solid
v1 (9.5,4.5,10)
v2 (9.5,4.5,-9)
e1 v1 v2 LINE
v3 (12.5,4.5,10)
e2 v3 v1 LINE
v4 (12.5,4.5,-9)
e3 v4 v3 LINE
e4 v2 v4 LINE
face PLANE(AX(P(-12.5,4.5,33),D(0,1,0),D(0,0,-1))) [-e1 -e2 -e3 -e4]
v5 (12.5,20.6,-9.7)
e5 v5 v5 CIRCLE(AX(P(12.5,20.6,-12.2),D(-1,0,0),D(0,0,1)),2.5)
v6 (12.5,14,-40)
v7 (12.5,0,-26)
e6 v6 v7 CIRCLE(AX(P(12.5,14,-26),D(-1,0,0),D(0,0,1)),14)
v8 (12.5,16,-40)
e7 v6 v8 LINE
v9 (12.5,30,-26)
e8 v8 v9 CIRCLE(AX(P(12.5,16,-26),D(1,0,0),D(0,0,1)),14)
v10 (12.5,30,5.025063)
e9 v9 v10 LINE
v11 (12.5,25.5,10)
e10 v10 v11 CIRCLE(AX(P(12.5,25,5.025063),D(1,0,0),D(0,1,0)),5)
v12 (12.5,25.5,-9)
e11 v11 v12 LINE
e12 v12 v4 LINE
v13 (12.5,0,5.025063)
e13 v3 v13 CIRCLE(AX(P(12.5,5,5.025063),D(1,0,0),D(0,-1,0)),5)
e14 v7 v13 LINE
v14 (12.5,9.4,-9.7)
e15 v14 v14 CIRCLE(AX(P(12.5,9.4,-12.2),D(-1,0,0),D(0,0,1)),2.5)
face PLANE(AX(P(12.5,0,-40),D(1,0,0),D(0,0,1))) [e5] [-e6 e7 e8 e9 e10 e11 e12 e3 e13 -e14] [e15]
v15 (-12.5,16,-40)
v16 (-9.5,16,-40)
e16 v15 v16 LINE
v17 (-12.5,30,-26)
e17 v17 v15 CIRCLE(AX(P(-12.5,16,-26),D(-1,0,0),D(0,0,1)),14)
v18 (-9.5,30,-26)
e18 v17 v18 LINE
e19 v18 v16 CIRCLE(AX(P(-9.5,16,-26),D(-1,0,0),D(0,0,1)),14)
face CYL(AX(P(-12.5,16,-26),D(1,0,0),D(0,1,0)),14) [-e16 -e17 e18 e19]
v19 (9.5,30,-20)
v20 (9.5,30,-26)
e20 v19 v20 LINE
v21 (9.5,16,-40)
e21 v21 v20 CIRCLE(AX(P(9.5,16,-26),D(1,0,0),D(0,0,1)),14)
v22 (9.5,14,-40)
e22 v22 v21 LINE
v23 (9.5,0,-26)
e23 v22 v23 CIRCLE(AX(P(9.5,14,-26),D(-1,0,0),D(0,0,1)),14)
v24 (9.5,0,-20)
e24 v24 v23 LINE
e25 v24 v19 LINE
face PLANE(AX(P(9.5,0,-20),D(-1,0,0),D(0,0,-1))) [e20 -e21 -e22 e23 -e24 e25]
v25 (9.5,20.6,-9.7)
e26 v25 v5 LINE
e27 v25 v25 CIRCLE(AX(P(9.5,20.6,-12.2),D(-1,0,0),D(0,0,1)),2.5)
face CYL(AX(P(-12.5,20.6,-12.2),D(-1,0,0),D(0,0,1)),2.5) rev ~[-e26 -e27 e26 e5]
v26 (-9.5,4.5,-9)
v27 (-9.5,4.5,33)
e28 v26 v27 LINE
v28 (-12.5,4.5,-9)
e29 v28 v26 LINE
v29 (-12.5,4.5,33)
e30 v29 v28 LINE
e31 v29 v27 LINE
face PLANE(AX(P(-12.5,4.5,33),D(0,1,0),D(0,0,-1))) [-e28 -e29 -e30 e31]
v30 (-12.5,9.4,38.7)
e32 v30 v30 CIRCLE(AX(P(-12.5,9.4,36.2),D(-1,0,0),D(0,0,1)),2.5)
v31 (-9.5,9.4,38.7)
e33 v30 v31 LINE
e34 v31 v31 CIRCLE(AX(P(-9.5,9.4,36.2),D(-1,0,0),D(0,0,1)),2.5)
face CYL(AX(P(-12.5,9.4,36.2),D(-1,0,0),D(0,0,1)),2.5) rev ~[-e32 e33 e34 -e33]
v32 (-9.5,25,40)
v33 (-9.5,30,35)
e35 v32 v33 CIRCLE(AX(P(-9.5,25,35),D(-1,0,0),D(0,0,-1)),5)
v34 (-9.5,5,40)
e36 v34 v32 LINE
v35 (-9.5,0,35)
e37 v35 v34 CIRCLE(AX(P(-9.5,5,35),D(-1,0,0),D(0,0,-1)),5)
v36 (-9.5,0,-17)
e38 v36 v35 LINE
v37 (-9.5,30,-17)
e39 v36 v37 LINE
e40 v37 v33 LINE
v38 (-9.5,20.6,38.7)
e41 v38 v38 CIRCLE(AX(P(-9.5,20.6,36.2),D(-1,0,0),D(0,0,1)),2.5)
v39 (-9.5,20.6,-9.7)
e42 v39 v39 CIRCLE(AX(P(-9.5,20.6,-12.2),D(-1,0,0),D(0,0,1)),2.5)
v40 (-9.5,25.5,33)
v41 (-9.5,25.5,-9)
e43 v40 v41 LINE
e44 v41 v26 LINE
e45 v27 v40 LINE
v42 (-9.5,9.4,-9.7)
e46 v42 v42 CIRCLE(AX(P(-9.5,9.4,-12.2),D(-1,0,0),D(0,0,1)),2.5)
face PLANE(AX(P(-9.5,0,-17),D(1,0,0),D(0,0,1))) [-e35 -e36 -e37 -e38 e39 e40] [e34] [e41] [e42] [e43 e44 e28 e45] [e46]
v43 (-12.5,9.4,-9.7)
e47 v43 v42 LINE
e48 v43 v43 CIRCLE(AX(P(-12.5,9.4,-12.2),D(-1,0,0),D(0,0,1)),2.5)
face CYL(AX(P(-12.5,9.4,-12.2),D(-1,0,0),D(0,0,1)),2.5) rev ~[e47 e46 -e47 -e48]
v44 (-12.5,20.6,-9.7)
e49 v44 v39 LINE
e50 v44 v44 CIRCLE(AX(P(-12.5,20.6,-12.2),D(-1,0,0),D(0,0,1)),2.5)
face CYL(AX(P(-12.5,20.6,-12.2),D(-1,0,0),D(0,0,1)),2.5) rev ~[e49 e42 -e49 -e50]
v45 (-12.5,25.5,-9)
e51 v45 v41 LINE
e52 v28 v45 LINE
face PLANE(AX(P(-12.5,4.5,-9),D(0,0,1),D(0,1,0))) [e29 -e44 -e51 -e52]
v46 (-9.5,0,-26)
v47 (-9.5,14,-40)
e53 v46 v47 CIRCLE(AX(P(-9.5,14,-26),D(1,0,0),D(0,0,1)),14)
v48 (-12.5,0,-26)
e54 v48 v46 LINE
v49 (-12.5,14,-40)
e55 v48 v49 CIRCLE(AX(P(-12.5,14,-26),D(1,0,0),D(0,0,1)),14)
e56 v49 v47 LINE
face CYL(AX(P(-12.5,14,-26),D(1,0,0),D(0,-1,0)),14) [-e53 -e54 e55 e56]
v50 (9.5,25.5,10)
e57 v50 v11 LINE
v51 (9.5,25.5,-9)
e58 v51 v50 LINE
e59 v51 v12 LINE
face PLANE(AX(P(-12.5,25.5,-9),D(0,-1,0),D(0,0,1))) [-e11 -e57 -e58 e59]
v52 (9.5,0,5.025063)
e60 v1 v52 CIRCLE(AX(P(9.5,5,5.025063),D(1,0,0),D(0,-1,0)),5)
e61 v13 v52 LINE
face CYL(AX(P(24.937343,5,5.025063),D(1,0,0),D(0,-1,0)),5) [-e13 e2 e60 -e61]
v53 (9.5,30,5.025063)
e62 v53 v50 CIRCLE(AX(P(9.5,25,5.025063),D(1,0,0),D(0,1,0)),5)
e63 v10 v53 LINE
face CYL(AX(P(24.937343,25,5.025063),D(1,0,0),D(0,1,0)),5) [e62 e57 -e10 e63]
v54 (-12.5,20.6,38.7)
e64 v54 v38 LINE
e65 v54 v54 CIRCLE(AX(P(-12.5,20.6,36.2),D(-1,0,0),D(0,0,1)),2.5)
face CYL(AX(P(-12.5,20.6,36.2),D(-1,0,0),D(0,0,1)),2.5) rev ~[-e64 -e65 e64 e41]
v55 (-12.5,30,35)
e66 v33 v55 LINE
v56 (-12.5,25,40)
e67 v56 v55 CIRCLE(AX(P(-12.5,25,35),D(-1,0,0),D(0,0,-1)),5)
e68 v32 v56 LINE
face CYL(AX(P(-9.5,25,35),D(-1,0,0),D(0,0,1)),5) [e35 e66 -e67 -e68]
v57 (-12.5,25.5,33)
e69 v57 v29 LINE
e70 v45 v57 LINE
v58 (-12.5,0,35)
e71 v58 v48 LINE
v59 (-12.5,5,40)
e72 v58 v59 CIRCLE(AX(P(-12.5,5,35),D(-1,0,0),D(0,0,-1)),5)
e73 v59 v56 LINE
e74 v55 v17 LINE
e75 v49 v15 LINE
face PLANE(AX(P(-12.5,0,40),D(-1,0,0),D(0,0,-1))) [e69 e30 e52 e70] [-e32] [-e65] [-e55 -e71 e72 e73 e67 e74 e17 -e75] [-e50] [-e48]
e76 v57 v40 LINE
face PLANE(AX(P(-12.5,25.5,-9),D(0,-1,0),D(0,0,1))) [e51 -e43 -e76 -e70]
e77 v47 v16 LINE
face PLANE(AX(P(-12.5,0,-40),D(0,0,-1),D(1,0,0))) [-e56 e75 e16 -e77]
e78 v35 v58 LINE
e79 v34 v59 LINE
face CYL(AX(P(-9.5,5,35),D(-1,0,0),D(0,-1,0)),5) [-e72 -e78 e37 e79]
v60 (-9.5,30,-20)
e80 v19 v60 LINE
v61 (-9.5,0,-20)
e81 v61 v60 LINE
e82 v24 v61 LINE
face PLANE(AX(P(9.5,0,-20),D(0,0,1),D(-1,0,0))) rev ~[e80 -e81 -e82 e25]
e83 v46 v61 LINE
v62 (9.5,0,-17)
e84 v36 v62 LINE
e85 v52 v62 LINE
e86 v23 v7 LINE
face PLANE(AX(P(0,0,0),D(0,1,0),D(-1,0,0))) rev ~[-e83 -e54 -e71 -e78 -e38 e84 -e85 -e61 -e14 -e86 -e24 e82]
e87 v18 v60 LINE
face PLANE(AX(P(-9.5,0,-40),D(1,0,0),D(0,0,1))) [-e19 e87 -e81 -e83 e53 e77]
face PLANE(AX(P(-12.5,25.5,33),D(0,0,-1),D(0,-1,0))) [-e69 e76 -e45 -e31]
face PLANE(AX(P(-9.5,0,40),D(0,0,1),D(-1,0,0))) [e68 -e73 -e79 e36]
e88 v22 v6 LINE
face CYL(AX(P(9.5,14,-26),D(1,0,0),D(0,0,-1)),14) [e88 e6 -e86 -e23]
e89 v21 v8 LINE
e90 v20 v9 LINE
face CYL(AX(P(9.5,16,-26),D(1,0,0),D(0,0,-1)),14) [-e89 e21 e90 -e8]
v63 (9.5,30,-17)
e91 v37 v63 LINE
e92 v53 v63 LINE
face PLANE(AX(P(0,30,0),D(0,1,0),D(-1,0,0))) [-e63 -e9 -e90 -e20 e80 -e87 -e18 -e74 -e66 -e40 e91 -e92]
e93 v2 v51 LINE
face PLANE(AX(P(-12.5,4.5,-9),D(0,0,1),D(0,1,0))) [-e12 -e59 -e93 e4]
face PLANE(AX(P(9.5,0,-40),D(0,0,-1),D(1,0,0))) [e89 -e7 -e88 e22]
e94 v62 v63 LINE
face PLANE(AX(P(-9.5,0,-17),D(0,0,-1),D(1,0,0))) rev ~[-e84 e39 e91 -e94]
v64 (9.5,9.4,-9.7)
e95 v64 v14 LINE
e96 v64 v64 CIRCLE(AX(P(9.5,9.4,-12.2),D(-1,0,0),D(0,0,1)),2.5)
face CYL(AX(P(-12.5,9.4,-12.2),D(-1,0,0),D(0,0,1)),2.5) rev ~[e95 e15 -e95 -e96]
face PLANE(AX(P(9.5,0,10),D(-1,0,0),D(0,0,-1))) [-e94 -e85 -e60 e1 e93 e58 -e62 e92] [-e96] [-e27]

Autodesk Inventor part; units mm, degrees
ref_plane "YZ Plane" through (0, 0, 0) normal (1, 0, 0) x (0, 1, 0)
ref_plane "XZ Plane" through (0, 0, 0) normal (0, 1, 0) x (-1, 0, 0)
ref_plane "XY Plane" through (0, 0, 0) normal (0, 0, 1) x (1, 0, 0)
sketch "Esquisse1" plane through (0, 0, 0) normal (0, 1, 0) x (-1, 0, 0)
  line L0 (-9.5, -40) -> (-12.5, -40)
  line L1 (-12.5, -40) -> (-12.5, 10)
  line L2 (-12.5, 10) -> (-9.5, 10)
  line L3 (-9.5, 10) -> (-9.5, -40)
  line L4 (9.5, 40) -> (12.5, 40)
  line L5 (12.5, 40) -> (12.5, -40)
  line L6 (12.5, -40) -> (9.5, -40)
  line L7 (9.5, -40) -> (9.5, 40)
  line L8 (-9.5, -20) -> (9.5, -20)
  line L9 (9.5, -20) -> (9.5, -17)
  line L10 (9.5, -17) -> (-9.5, -17)
  line L11 (-9.5, -17) -> (-9.5, -20)
  point P0 (0, 0)
  dimension "d0" = 3
  dimension "d1" = 3
  dimension "d2" = 3
  dimension "d4" = 25
  dimension "d5" = 80
  dimension "d6" = 40
  dimension "d7" = 12.5
  dimension "d11" = 57
  dimension "d12" = 30
extrude "Extrusion1" add sketch "Esquisse1" along normal blind 30
fillet "Congé1" radius 14 4 edges at (11, 30, -40) (-11, 30, -40) (11, 0, -40) (-11, 0, -40)
sketch "Esquisse2" plane through (-12.5, 0, 40) normal (-1, 0, 0) x (0, 0, 1)
  line L0 (0, 0) -> (0, 30) projected
  line L1 (-80, 14) -> (-80, 16) projected
  line L2 (-49, 25.5) -> (-7, 25.5)
  line L3 (-7, 25.5) -> (-7, 4.5)
  line L4 (-7, 4.5) -> (-49, 4.5)
  line L5 (-49, 4.5) -> (-49, 25.5)
  line L6 (0, 15) -> (-80, 15) construction
  line L7 (-7, 25.5) -> (0, 25.5) construction
  line L8 (0, 25.5) -> (0, 4.5) construction
  line L9 (0, 4.5) -> (-7, 4.5) construction
  line L10 (-7, 4.5) -> (-7, 25.5) construction
  line L11 (-49, 25.5) -> (-56, 25.5) construction
  line L12 (-56, 25.5) -> (-56, 4.5) construction
  line L13 (-56, 4.5) -> (-49, 4.5) construction
  line L14 (-49, 4.5) -> (-49, 25.5) construction
  circle A0 centre (-52.2, 20.6) radius 2.5
  circle A1 centre (-52.2, 9.4) radius 2.5
  circle A2 centre (-3.8, 9.4) radius 2.5
  circle A3 centre (-3.8, 20.6) radius 2.5
  point P0 (-40, 0)
  dimension "d16" = 21
  dimension "d17" = 10.5
  dimension "d18" = 7
  dimension "d19" = 42
  dimension "d20" = 7
  dimension "d21" = 7
  dimension "d22" = 5
  dimension "d23" = 4.9
  dimension "d24" = 3.8
  dimension "d25" = 5
  dimension "d26" = 5
  dimension "d27" = 5
  dimension "d28" = 3.8
  dimension "d29" = 4.9
  dimension "d30" = 3.8
  dimension "d31" = 4.9
  dimension "d32" = 3.8
  dimension "d33" = 4.9
extrude "Extrusion2" cut sketch "Esquisse2" against normal through all
fillet "Congé2" radius 5 1 edges at (-11, 0, 40)
fillet "Congé3" radius 5 1 edges at (-11, 30, 40)
fillet "Congé4" radius 5 1 edges at (11, 0, 10)
fillet "Congé5" radius 5 1 edges at (11, 30, 10)
equation "\"d6\" = 0.5 * d5"
equation "\"d7\" = 0.5 * d4"
equation "\"d17\" = 0.5 * d16"
equation "\"d21\" = d20"
equation "\"d25\" = d22"
equation "\"d26\" = d22"
equation "\"d27\" = d22"
equation "\"d28\" = d24"
equation "\"d29\" = d23"
equation "\"d30\" = d24"
equation "\"d31\" = d23"
equation "\"d32\" = d24"
equation "\"d33\" = d23"
properties part number "new_leg_2"
